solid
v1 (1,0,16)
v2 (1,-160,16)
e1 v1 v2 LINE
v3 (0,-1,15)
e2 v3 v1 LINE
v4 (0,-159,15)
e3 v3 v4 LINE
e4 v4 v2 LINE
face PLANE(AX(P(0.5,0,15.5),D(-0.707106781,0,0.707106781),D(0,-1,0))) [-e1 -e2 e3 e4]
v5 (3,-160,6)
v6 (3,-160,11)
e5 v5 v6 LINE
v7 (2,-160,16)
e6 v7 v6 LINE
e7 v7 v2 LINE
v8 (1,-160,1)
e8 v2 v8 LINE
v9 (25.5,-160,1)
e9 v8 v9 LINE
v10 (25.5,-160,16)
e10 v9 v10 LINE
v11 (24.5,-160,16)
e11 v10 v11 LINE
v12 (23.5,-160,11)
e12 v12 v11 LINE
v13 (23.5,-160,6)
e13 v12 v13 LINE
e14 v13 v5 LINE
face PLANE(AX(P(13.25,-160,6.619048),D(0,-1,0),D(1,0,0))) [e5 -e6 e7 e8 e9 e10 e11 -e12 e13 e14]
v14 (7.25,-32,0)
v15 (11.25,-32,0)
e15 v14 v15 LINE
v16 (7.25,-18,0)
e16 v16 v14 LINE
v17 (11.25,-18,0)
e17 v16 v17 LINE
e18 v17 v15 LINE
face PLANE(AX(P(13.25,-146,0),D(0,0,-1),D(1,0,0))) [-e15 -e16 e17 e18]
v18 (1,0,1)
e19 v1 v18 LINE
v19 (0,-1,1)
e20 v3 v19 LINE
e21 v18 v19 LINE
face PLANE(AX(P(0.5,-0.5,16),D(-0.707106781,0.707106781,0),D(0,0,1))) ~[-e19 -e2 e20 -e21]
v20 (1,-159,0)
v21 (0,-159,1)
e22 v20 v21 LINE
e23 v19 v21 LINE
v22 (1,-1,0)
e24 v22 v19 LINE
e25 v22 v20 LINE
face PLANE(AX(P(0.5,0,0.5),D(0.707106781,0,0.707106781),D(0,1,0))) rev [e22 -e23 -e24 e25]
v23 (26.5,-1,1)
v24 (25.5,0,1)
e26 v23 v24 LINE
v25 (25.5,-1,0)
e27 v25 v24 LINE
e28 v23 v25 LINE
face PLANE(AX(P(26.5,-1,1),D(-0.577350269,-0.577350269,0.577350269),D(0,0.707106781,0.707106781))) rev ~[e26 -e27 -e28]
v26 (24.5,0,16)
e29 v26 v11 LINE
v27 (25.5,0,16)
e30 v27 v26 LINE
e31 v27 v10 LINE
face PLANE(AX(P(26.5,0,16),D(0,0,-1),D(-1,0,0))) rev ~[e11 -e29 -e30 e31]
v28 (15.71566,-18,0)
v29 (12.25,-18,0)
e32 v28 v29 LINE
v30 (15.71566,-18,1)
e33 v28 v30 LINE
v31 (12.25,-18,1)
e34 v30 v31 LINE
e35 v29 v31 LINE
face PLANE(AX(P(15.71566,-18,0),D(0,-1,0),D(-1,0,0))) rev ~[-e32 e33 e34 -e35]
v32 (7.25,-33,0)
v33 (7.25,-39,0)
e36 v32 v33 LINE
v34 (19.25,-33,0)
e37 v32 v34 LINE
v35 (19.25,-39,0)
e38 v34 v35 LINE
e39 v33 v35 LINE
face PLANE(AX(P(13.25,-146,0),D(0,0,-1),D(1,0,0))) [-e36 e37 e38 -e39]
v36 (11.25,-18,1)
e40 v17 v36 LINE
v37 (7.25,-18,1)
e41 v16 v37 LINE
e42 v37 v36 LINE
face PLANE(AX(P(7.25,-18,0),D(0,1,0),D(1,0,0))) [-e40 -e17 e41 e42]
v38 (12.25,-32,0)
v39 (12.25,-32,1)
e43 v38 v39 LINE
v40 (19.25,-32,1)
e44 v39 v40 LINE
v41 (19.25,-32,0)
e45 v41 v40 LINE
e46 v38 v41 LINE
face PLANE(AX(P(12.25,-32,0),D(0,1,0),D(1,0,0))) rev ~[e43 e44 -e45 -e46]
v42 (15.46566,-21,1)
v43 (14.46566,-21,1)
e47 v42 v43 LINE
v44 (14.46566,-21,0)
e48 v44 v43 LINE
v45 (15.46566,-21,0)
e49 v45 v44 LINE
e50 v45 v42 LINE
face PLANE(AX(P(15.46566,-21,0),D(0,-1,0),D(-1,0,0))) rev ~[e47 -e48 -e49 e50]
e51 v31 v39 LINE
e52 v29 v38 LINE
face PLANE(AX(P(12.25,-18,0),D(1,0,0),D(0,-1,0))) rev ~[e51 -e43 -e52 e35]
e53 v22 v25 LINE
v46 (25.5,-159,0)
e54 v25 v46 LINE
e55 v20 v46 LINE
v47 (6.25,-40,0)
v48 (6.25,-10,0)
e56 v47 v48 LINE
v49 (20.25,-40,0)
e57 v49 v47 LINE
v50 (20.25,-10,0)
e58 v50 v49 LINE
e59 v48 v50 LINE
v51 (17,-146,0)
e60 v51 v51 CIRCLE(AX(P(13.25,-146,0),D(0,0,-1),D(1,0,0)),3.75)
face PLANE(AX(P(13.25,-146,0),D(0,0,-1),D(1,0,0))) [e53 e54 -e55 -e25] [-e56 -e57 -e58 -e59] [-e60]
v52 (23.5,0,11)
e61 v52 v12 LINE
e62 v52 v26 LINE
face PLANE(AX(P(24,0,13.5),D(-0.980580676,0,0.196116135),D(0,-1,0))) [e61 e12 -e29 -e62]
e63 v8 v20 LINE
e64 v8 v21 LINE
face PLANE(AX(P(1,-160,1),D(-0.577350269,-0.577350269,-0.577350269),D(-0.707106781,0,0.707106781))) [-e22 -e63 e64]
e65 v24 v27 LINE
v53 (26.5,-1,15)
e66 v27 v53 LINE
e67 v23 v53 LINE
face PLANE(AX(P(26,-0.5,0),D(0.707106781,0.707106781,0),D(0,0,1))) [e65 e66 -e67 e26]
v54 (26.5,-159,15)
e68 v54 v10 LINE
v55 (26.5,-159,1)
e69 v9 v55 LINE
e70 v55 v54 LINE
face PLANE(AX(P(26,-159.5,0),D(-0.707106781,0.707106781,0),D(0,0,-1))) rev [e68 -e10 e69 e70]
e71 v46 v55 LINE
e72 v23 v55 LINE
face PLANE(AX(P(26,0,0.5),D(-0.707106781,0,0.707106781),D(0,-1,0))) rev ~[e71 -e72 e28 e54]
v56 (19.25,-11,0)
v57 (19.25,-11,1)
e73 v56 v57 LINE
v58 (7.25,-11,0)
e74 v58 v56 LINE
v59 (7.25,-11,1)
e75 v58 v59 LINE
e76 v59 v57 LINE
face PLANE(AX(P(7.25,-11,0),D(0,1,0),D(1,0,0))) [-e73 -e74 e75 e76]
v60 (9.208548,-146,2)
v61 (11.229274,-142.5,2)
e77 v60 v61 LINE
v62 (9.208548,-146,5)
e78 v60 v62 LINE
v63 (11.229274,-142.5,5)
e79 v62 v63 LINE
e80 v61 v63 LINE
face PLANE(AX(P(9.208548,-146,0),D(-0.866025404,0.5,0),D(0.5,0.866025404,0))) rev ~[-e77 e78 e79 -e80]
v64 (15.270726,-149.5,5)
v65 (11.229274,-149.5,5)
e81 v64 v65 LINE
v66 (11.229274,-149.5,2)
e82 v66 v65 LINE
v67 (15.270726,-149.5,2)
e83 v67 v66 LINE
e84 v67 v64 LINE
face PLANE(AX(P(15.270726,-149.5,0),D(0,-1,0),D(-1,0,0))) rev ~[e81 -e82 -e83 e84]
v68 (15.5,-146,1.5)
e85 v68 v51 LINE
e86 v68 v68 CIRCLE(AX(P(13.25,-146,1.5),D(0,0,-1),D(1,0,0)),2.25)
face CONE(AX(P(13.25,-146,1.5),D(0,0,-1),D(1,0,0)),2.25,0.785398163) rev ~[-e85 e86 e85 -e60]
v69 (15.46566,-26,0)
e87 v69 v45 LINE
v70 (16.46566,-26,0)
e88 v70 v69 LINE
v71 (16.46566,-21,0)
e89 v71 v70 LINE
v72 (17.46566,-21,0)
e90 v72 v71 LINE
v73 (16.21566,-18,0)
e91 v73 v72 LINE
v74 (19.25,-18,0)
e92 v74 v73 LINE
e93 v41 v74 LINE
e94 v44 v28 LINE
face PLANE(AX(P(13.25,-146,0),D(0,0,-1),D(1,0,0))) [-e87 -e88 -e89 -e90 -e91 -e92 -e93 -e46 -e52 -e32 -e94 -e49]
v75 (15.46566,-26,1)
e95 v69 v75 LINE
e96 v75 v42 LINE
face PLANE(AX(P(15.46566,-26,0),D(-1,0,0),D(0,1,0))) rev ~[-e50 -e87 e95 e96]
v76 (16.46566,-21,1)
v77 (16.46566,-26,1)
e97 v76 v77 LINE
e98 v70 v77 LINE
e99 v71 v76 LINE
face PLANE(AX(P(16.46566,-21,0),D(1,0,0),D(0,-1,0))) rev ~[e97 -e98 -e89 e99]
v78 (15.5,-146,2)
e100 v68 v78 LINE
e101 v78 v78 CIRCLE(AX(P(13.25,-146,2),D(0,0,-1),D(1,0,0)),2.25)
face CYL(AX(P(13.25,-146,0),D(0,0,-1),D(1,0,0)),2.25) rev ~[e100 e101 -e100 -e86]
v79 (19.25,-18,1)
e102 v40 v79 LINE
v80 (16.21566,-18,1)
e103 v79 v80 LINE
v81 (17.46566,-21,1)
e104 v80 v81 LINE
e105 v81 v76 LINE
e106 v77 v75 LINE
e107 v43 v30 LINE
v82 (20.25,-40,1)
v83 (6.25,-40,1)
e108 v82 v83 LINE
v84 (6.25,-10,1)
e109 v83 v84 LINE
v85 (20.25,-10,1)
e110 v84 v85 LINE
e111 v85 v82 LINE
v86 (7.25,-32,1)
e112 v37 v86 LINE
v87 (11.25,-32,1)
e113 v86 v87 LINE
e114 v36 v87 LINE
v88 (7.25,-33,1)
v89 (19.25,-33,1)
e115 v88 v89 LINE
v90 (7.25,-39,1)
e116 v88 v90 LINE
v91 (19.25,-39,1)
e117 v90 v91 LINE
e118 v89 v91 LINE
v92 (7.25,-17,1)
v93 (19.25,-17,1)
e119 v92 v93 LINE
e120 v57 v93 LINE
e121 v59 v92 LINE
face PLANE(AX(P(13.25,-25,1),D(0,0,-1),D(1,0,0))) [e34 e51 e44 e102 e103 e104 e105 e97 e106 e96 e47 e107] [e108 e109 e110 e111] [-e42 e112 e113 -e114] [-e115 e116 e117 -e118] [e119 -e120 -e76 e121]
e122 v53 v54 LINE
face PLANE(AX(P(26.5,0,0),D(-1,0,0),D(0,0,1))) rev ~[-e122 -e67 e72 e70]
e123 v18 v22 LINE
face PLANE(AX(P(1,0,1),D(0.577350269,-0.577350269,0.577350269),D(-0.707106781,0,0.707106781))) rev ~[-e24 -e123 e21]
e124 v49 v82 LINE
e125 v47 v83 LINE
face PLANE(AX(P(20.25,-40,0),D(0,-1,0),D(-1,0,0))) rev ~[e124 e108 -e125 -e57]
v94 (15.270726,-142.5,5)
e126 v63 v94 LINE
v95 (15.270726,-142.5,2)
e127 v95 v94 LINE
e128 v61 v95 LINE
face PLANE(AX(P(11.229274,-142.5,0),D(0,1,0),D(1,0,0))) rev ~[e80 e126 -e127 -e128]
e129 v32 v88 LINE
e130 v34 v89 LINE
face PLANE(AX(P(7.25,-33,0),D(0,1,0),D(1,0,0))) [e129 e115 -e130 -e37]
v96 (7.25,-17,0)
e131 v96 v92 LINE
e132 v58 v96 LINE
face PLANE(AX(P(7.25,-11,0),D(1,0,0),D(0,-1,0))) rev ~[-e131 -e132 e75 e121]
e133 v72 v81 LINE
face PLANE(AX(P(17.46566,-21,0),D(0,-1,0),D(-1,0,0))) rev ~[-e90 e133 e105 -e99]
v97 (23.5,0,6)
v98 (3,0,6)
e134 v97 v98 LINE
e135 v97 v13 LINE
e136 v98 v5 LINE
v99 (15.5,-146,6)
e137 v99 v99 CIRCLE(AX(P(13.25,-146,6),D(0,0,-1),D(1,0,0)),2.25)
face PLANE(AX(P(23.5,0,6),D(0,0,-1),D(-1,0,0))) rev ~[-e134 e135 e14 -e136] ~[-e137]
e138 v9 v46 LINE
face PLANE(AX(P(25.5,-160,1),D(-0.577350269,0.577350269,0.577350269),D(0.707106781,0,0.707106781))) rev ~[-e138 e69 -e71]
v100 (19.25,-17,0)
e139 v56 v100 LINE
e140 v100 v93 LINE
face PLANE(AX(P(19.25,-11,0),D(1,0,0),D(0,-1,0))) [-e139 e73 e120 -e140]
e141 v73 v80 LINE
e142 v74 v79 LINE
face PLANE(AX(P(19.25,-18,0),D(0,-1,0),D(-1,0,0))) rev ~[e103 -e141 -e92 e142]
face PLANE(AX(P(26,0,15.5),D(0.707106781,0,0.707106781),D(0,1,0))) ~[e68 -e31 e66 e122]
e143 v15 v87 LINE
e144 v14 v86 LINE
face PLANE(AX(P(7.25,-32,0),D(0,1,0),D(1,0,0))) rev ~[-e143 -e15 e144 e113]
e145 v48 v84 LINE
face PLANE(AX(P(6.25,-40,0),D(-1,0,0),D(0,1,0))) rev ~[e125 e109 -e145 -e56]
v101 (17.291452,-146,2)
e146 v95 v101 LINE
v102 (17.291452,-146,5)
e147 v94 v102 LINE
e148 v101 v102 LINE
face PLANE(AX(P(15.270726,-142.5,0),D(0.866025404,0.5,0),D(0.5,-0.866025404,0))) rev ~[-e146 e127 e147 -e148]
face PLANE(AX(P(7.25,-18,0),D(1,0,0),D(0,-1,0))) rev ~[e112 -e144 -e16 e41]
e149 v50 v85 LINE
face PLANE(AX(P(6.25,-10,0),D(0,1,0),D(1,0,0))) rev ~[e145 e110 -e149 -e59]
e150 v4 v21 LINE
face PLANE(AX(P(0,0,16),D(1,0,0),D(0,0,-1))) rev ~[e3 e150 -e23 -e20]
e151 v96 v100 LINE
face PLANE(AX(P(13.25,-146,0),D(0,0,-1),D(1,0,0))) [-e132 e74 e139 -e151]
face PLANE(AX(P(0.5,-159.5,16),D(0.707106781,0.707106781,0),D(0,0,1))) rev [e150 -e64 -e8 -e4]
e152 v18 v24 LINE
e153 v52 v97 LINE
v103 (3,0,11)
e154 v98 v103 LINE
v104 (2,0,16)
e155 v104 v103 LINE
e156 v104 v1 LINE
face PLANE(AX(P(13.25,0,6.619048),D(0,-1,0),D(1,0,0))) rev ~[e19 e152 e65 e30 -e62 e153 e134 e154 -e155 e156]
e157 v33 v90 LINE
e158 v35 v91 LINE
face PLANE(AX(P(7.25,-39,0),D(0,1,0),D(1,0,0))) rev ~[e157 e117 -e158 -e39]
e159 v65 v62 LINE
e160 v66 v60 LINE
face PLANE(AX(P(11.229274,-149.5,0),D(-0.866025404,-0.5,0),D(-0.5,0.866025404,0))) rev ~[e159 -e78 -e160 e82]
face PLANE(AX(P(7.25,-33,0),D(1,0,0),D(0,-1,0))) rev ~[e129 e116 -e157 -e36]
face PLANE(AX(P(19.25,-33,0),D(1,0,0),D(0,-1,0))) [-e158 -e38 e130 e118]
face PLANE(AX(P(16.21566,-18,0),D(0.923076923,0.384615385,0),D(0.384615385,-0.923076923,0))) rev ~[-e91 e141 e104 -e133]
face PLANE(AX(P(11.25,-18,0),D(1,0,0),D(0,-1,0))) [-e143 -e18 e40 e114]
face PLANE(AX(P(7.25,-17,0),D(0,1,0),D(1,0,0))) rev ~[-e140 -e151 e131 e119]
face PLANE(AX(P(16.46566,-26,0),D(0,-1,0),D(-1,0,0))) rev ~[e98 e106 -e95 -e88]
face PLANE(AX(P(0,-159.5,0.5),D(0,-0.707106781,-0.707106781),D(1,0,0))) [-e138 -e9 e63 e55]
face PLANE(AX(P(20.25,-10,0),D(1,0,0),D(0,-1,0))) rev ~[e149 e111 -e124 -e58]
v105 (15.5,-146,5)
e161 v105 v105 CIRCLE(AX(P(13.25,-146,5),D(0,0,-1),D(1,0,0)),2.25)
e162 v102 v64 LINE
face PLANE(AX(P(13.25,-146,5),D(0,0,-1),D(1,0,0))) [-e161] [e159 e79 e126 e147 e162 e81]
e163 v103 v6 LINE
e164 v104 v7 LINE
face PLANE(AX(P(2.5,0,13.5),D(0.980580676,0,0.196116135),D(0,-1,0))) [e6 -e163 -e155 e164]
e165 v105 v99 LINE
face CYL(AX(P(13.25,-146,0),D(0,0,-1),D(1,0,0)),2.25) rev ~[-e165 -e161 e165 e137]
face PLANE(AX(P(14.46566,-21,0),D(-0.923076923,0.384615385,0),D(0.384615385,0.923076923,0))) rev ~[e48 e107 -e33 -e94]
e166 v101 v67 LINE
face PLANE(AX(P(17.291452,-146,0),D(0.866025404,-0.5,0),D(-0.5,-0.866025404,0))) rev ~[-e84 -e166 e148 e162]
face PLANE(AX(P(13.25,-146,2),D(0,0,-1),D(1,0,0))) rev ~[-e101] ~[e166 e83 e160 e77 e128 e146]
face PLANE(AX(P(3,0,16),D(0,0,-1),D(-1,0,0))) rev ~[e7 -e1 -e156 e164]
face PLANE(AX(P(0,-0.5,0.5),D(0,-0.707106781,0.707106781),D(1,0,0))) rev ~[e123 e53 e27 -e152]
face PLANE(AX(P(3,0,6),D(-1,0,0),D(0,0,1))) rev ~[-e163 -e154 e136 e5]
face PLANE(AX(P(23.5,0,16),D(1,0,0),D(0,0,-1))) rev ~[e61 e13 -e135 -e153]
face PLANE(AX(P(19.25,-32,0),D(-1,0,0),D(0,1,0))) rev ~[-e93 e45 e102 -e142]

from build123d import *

# Parameters (mm, degrees)
F1_DEPTH  = 160
F2_R      = 2.25
F3_DEPTH  = 16.001
F4_SIZE2  = 1
F4_SIZE   = 5
F5_SIZE2  = 5
F5_SIZE   = 1
F7_DEPTH  = 5
F8_R      = 2.25
F9_DEPTH  = 2
F10_SIZE  = 1.5
F11_SIZE  = 1
F12_W     = 12
F12_H     = 6
F12_W_2   = 4
F12_H_2   = 14
F13_DEPTH = 1


# Not quite as in the source:
# - a feature names something its author has since deleted; it is built from what else it names


with BuildPart() as f1:
    # F0 (on Front) → F1 (new body)
    with BuildSketch(Plane.XZ):
        Polygon((0, 16), (0, 0), (26.5, 0), (26.5, 16), (23.5, 16), (23.5, 6), (3, 6), (3, 16), align=None)
    extrude(amount=F1_DEPTH)

    # F2 (on face) → F3 (cut, through all)
    with BuildSketch(Plane(origin=(0, 0, 0), x_dir=(1, 0, 0), z_dir=(0, 0, -1))):
        with Locations((13.25, 146)):
            Circle(F2_R)
    extrude(amount=-F3_DEPTH, mode=Mode.SUBTRACT)

    # F4
    f4_edges = [f1.edges().sort_by_distance(p)[0] for p in [
        (23.5, -80, 16),
    ]]
    f4_side = f1.faces().sort_by_distance((23.5, -80, 11))[0]
    chamfer(f4_edges, length=F4_SIZE, length2=F4_SIZE2, reference=f4_side)

    # F5
    f5_edges = [f1.edges().sort_by_distance(p)[0] for p in [
        (3, -80, 16),
    ]]
    f5_side = f1.faces().sort_by_distance((1.5, -80, 16))[0]
    chamfer(f5_edges, length=F5_SIZE, length2=F5_SIZE2, reference=f5_side)

    # F6 (on face) → F7 (cut)
    with BuildSketch(Plane(origin=(0, 0, 0), x_dir=(1, 0, 0), z_dir=(0, 0, -1))):
        Polygon((15.2707259422, 149.5), (11.2292740578, 149.5), (9.2085481157, 146), (11.2292740578, 142.5), (15.2707259422, 142.5), (17.2914518843, 146), align=None)
    extrude(amount=-F7_DEPTH, mode=Mode.SUBTRACT)

    # F8 (on face) → F9 (join)
    with BuildSketch(Plane(origin=(0, 0, 0), x_dir=(1, 0, 0), z_dir=(0, 0, -1))):
        Polygon((15.2707259422, 149.5), (11.2292740578, 149.5), (9.2085481157, 146), (11.2292740578, 142.5), (15.2707259422, 142.5), (17.2914518843, 146), align=None)
        with Locations((13.25, 146)):
            Circle(F8_R, mode=Mode.SUBTRACT)
    extrude(amount=-F9_DEPTH)

    # F10
    f10_edges = [f1.edges().sort_by_distance(p)[0] for p in [
        (11, -146, 0),
    ]]
    chamfer(f10_edges, length=F10_SIZE)

    # F11
    f11_edges = [f1.edges().sort_by_distance(p)[0] for p in [
        (0, -80, 0),
        (13.25, 0, 0),
        (26.5, -80, 0),
        (13.25, -160, 0),
        (0, 0, 8),
        (26.5, 0, 8),
        (0, -160, 8),
        (26.5, -160, 8),
        (26.5, -80, 16),
        (0, -80, 16),
    ]]
    chamfer(f11_edges, length=F11_SIZE)

    # F12 (on face) → F13 (cut)
    with BuildSketch(Plane(origin=(0, 0, 0), x_dir=(1, 0, 0), z_dir=(0, 0, -1))):
        Polygon((6.25, 18), (6.25, 10), (20.25, 10), (20.25, 18), (20.25, 32), (20.25, 33), (20.25, 40), (6.25, 40), (6.25, 33), align=None)
        with Locations((13.25, 14)):
            Rectangle(F12_W, F12_H, mode=Mode.SUBTRACT)
        with Locations((9.25, 25)):
            Rectangle(F12_W_2, F12_H_2, mode=Mode.SUBTRACT)
        Polygon((15.7156598493, 18), (12.25, 18), (12.25, 32), (19.25, 32), (19.25, 18), (16.2156598493, 18), (17.4656598493, 21), (16.4656598493, 21), (16.4656598493, 26), (15.4656598493, 26), (15.4656598493, 21), (14.4656598493, 21), align=None, mode=Mode.SUBTRACT)
        with Locations((13.25, 36)):
            Rectangle(F12_W, F12_H, mode=Mode.SUBTRACT)
    extrude(amount=-F13_DEPTH, mode=Mode.SUBTRACT)


solid = f1.part
